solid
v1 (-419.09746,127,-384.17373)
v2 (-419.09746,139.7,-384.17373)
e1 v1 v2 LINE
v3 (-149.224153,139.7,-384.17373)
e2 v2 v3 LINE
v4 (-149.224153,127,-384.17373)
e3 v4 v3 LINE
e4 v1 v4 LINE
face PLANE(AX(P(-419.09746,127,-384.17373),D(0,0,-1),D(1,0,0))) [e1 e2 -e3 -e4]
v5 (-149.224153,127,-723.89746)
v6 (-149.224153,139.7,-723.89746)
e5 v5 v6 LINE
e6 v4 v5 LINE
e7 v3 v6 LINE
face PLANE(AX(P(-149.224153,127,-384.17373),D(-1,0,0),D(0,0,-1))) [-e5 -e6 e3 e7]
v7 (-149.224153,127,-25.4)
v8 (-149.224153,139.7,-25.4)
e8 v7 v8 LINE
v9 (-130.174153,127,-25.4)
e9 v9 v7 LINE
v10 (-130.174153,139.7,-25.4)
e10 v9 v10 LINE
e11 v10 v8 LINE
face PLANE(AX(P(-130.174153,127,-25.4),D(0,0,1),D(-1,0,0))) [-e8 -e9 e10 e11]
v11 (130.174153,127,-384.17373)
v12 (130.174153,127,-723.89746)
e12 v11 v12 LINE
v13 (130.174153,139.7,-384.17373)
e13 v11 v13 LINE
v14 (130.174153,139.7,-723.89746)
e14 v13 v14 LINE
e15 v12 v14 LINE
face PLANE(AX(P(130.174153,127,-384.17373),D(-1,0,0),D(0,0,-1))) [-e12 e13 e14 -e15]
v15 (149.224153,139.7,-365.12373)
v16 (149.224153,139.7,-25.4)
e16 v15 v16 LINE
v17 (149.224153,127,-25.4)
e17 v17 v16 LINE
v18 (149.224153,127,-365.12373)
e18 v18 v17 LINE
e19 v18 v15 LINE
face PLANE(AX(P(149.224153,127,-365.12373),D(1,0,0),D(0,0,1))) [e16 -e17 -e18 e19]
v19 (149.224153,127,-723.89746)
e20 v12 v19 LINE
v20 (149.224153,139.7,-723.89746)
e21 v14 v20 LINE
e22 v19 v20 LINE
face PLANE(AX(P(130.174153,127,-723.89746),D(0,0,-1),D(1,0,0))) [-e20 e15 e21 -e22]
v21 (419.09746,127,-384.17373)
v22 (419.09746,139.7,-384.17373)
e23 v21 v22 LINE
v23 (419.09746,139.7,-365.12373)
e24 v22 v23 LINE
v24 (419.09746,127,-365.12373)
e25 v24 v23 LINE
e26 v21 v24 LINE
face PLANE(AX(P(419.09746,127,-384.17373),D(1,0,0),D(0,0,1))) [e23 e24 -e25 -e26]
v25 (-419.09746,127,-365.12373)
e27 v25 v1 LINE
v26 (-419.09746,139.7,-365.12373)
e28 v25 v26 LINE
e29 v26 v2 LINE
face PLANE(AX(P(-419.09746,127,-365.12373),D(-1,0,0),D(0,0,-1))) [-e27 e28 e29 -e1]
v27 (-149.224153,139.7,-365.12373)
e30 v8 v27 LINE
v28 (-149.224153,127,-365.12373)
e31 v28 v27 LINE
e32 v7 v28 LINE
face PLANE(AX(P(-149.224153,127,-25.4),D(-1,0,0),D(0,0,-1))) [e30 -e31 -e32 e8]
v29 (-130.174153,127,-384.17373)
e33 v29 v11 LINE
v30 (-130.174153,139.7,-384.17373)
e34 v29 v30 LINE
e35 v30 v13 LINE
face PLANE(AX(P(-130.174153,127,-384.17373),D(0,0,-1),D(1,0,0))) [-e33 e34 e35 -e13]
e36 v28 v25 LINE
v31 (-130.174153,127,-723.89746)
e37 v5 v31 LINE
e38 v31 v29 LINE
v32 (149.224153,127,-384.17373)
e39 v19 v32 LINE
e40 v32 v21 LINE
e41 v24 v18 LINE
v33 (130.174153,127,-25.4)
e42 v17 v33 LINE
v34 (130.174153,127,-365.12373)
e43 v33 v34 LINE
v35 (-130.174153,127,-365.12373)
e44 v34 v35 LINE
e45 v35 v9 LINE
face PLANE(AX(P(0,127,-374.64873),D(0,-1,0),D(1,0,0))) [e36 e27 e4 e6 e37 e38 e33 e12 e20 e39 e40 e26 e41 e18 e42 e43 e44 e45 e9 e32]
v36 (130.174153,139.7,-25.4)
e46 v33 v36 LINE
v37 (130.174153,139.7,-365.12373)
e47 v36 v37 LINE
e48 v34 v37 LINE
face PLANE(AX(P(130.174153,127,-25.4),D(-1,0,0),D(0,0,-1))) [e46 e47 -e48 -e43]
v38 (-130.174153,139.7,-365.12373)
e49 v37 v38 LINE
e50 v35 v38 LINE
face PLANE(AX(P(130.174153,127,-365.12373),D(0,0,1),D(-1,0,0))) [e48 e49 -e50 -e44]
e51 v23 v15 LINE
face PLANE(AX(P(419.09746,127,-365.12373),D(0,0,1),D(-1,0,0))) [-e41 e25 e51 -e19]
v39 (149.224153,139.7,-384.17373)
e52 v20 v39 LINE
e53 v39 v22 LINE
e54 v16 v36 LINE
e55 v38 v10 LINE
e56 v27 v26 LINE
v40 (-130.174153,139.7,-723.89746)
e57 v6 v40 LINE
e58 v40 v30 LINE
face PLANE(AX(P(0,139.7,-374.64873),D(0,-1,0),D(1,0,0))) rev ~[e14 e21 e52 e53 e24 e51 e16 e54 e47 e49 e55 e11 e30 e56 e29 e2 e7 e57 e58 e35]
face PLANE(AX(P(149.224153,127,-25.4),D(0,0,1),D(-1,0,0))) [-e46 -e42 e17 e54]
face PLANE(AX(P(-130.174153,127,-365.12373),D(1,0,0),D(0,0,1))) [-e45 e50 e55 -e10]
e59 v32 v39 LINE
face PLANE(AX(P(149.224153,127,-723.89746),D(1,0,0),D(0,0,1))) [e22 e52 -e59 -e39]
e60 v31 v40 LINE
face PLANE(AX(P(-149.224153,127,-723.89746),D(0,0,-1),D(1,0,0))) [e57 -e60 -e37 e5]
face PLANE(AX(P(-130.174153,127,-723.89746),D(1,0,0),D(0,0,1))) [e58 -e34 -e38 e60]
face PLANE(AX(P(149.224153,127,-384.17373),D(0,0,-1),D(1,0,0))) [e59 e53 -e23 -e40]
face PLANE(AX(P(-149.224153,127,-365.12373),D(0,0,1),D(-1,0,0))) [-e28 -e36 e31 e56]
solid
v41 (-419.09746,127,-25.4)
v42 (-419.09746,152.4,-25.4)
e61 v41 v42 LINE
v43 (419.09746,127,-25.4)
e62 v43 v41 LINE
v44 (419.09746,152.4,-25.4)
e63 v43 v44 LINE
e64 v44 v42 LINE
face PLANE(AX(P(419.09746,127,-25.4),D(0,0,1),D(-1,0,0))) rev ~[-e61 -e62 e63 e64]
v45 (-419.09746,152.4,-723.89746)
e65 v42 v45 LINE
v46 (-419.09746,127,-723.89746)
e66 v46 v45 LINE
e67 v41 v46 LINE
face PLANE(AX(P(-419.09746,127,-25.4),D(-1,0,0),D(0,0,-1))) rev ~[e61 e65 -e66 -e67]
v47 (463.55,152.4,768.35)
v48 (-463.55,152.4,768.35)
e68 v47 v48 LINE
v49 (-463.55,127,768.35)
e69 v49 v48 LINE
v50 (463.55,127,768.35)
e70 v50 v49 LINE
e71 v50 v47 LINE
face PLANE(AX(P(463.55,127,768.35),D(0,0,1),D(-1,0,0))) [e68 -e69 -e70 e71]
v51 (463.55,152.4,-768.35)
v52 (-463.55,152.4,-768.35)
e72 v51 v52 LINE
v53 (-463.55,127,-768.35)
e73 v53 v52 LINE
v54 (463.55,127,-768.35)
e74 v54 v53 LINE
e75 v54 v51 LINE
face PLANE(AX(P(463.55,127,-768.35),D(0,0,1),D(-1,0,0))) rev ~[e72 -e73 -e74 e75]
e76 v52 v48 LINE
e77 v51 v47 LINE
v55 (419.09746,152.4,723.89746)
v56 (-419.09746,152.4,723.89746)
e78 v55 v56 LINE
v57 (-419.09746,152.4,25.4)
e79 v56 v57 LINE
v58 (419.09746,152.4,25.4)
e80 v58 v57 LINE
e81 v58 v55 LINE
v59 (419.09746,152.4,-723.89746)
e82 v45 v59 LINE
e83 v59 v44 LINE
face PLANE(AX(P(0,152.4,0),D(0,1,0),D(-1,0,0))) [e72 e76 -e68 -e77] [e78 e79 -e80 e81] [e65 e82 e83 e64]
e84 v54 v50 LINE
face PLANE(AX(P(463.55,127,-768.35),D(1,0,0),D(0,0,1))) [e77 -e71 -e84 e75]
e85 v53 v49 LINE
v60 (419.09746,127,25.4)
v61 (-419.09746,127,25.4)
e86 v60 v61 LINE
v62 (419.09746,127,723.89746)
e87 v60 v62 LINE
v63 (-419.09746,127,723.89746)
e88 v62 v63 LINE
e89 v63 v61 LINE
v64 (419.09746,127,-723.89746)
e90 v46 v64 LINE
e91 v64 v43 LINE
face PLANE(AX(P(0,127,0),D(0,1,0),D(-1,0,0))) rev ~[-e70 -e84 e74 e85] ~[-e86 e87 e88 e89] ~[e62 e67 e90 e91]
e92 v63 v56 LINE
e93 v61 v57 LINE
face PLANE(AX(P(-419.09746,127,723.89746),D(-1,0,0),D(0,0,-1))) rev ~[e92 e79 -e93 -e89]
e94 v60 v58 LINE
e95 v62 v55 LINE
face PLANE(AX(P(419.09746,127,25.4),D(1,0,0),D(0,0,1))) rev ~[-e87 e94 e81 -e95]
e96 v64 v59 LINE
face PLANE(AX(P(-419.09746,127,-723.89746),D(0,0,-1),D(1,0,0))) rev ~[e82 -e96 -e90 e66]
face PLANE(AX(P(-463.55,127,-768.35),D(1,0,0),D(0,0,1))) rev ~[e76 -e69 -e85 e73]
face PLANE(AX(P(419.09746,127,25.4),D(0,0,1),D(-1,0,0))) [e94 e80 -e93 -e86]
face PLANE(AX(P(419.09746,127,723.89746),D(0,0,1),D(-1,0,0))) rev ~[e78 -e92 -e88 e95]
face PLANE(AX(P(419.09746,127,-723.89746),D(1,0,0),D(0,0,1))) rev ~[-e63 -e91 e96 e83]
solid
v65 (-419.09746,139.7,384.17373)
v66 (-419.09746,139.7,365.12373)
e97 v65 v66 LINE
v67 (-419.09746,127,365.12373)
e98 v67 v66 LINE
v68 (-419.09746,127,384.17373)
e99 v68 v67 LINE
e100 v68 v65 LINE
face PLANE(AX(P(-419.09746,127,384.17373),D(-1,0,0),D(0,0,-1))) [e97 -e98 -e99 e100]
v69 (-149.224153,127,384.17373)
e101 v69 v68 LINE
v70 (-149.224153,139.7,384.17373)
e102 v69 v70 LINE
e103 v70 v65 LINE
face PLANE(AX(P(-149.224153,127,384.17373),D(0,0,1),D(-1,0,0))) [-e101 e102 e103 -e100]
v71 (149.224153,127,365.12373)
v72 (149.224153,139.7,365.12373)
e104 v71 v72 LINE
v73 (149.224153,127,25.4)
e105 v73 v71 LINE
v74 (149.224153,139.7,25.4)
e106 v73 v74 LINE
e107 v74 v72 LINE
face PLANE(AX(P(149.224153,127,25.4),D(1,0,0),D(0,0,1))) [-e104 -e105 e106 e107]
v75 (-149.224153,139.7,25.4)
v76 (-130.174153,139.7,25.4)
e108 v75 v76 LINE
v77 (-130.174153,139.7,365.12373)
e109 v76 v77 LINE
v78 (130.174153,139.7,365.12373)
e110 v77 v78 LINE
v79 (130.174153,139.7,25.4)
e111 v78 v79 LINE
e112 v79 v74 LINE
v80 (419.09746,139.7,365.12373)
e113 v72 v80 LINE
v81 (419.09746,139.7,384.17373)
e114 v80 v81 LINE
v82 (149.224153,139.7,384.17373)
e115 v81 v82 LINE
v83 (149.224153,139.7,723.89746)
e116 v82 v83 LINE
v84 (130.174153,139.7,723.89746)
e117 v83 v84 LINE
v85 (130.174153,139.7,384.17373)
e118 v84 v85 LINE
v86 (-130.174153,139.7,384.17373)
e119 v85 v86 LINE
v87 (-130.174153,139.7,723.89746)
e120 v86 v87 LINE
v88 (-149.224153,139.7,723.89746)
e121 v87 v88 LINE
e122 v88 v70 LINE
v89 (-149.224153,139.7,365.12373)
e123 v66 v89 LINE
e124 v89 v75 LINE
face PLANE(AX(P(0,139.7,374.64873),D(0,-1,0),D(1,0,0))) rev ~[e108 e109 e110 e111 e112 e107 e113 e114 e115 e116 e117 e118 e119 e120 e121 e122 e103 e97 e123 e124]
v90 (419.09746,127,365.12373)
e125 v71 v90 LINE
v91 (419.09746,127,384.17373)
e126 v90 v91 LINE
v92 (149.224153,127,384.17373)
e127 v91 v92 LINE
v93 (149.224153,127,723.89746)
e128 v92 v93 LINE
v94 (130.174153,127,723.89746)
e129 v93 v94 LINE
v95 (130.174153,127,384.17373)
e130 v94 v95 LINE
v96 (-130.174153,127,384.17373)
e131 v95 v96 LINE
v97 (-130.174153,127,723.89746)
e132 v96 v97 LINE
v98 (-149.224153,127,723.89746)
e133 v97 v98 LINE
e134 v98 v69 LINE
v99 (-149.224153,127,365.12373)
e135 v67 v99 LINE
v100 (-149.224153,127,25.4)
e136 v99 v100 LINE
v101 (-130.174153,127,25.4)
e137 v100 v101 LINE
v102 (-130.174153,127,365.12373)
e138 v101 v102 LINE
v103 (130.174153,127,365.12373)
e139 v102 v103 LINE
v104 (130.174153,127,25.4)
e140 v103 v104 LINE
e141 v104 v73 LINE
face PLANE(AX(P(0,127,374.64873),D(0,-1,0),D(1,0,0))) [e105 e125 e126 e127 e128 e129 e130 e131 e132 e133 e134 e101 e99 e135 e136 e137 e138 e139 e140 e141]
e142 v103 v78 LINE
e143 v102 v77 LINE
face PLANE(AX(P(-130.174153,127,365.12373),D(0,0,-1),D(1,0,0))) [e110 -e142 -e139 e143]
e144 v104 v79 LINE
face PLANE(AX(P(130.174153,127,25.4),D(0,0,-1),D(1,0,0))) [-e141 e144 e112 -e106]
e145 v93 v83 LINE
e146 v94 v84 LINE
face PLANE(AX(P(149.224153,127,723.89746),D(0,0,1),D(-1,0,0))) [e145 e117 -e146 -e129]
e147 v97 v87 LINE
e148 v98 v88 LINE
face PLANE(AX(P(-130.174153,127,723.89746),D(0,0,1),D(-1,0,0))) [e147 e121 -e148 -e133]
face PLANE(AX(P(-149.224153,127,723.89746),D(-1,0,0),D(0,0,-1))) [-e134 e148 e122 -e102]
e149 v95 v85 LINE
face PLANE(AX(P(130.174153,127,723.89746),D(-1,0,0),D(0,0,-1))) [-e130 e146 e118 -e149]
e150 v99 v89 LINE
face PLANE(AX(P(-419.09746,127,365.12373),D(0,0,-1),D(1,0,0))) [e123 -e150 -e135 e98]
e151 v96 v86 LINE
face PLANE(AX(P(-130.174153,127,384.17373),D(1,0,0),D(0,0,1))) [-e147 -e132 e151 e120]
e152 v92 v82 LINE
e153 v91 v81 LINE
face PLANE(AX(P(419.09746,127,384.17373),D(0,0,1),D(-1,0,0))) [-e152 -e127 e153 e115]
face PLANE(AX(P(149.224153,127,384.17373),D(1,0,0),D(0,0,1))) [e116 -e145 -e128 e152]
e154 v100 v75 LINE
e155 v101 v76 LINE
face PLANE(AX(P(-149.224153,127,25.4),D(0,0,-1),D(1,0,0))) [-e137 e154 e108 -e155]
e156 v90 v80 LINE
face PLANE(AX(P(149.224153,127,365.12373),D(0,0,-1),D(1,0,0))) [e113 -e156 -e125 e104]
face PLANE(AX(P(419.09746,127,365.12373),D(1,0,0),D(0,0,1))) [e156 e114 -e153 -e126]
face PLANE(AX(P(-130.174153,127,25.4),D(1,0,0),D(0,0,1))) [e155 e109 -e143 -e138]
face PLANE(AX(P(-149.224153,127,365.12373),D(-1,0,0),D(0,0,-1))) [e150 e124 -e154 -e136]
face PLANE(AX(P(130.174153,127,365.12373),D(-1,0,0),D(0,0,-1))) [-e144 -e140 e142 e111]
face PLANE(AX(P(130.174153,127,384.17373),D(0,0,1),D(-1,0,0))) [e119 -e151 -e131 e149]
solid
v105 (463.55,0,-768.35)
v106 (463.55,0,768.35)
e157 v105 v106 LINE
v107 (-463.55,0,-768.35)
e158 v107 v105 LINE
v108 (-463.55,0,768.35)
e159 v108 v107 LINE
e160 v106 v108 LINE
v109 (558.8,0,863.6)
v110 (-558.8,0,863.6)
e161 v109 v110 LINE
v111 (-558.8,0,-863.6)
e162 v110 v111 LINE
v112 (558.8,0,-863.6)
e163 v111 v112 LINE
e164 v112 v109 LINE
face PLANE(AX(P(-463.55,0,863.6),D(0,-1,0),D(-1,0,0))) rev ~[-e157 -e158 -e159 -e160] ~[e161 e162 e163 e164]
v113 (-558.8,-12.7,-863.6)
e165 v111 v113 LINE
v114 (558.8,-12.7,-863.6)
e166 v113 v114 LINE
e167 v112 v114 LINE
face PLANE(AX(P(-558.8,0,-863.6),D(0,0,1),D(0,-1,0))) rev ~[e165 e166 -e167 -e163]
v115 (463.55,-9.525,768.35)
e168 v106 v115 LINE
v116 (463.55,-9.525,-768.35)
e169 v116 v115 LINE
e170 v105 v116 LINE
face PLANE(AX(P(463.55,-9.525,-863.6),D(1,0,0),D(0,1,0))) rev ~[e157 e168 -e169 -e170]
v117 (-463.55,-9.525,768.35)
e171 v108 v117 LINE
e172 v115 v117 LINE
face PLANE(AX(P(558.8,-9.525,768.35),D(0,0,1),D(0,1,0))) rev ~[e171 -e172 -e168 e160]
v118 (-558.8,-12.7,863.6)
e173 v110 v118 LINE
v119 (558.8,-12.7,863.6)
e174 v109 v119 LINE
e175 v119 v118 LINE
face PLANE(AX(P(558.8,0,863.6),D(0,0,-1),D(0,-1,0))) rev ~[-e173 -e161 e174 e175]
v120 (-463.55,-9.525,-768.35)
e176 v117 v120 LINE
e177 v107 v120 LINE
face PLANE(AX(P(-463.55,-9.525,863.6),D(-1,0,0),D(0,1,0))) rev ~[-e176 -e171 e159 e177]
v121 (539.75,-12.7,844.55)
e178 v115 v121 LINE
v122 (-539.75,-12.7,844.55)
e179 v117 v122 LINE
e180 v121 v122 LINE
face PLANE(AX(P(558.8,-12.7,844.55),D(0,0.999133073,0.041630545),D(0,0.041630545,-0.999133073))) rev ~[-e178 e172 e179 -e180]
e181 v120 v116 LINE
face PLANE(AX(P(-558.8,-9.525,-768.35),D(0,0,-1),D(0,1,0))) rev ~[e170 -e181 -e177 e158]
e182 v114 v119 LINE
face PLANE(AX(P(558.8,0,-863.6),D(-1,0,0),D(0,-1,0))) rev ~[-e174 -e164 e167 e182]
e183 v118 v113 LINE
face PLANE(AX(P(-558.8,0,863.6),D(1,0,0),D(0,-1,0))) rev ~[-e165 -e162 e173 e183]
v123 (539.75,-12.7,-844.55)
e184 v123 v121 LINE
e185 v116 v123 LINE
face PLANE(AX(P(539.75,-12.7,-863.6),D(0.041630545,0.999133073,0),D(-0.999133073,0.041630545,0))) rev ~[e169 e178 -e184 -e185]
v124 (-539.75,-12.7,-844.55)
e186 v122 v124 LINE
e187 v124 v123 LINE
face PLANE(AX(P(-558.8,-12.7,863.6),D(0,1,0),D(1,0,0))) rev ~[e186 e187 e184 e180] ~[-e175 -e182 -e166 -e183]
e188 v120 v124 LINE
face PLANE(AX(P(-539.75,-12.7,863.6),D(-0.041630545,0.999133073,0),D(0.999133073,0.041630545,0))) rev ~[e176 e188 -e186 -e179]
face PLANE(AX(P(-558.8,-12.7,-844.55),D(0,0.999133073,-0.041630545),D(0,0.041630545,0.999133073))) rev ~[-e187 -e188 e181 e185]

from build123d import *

# Parameters (mm, degrees)
F3_W     = 927.1
F3_H     = 1536.7
F3_W_2   = 838.19492
F3_H_2   = 50.8
F4_DEPTH = 25.4
F6_DEPTH = 12.7


with BuildPart() as f4:
    # F3 (on 3pt) → F4 (new body)
    with BuildSketch(Plane(origin=(0, 127, 0), x_dir=(-1, 0, 0), z_dir=(0, 1, 0))):
        Rectangle(F3_W, F3_H)
        Polygon((-419.09746, 25.4), (-419.09746, 723.89746), (419.09746, 723.89746), (419.09746, 25.4), (419.09746, -25.4), (419.09746, -723.89746), (-419.09746, -723.89746), (-419.09746, -25.4), align=None, mode=Mode.SUBTRACT)
        Rectangle(F3_W_2, F3_H_2)
    extrude(amount=F4_DEPTH)


with BuildPart() as f6:
    # F5 (on face) → F6 (new body)
    with BuildSketch(Plane.XZ.offset(-127)):
        Polygon((130.1741533333, -723.89746), (149.2241533333, -723.89746), (149.2241533333, -384.17373), (419.09746, -384.17373), (419.09746, -365.12373), (149.2241533333, -365.12373), (149.2241533333, -25.4), (130.1741533333, -25.4), (130.1741533333, -365.12373), (-130.1741533333, -365.12373), (-130.1741533333, -25.4), (-149.2241533333, -25.4), (-149.2241533333, -365.12373), (-419.09746, -365.12373), (-419.09746, -384.17373), (-149.2241533333, -384.17373), (-149.2241533333, -723.89746), (-130.1741533333, -723.89746), (-130.1741533333, -384.17373), (130.1741533333, -384.17373), align=None)
    extrude(amount=-F6_DEPTH)


with BuildPart() as f6b:
    # F5 (on face) → F6, piece 2 (new body)
    with BuildSketch(Plane.XZ.offset(-127)):
        Polygon((-149.2241533333, 25.4), (-130.1741533333, 25.4), (-130.1741533333, 365.12373), (130.1741533333, 365.12373), (130.1741533333, 25.4), (149.2241533333, 25.4), (149.2241533333, 365.12373), (419.09746, 365.12373), (419.09746, 384.17373), (149.2241533333, 384.17373), (149.2241533333, 723.89746), (130.1741533333, 723.89746), (130.1741533333, 384.17373), (-130.1741533333, 384.17373), (-130.1741533333, 723.89746), (-149.2241533333, 723.89746), (-149.2241533333, 384.17373), (-419.09746, 384.17373), (-419.09746, 365.12373), (-149.2241533333, 365.12373), align=None)
    extrude(amount=-F6_DEPTH)


with BuildPart() as f8:
    # F8: sweep along a path in F0
    with BuildLine(Plane.XZ) as f8_path:
        Line((-558.8, 863.6), (-558.8, -863.6))
        Line((-558.8, -863.6), (558.8, -863.6))
        Line((558.8, -863.6), (558.8, 863.6))
        Line((558.8, 863.6), (-558.8, 863.6))
    # F7 (on Top) → F8 (sweep)
    with BuildSketch(Plane.XY):
        Polygon((-463.55, -9.525), (-463.55, 0), (-558.8, 0), (-558.8, -12.7), (-539.75, -12.7), align=None)
    sweep(path=f8_path.line, transition=Transition.RIGHT)


solid = Compound([f4.part, f6.part, f6b.part, f8.part])
